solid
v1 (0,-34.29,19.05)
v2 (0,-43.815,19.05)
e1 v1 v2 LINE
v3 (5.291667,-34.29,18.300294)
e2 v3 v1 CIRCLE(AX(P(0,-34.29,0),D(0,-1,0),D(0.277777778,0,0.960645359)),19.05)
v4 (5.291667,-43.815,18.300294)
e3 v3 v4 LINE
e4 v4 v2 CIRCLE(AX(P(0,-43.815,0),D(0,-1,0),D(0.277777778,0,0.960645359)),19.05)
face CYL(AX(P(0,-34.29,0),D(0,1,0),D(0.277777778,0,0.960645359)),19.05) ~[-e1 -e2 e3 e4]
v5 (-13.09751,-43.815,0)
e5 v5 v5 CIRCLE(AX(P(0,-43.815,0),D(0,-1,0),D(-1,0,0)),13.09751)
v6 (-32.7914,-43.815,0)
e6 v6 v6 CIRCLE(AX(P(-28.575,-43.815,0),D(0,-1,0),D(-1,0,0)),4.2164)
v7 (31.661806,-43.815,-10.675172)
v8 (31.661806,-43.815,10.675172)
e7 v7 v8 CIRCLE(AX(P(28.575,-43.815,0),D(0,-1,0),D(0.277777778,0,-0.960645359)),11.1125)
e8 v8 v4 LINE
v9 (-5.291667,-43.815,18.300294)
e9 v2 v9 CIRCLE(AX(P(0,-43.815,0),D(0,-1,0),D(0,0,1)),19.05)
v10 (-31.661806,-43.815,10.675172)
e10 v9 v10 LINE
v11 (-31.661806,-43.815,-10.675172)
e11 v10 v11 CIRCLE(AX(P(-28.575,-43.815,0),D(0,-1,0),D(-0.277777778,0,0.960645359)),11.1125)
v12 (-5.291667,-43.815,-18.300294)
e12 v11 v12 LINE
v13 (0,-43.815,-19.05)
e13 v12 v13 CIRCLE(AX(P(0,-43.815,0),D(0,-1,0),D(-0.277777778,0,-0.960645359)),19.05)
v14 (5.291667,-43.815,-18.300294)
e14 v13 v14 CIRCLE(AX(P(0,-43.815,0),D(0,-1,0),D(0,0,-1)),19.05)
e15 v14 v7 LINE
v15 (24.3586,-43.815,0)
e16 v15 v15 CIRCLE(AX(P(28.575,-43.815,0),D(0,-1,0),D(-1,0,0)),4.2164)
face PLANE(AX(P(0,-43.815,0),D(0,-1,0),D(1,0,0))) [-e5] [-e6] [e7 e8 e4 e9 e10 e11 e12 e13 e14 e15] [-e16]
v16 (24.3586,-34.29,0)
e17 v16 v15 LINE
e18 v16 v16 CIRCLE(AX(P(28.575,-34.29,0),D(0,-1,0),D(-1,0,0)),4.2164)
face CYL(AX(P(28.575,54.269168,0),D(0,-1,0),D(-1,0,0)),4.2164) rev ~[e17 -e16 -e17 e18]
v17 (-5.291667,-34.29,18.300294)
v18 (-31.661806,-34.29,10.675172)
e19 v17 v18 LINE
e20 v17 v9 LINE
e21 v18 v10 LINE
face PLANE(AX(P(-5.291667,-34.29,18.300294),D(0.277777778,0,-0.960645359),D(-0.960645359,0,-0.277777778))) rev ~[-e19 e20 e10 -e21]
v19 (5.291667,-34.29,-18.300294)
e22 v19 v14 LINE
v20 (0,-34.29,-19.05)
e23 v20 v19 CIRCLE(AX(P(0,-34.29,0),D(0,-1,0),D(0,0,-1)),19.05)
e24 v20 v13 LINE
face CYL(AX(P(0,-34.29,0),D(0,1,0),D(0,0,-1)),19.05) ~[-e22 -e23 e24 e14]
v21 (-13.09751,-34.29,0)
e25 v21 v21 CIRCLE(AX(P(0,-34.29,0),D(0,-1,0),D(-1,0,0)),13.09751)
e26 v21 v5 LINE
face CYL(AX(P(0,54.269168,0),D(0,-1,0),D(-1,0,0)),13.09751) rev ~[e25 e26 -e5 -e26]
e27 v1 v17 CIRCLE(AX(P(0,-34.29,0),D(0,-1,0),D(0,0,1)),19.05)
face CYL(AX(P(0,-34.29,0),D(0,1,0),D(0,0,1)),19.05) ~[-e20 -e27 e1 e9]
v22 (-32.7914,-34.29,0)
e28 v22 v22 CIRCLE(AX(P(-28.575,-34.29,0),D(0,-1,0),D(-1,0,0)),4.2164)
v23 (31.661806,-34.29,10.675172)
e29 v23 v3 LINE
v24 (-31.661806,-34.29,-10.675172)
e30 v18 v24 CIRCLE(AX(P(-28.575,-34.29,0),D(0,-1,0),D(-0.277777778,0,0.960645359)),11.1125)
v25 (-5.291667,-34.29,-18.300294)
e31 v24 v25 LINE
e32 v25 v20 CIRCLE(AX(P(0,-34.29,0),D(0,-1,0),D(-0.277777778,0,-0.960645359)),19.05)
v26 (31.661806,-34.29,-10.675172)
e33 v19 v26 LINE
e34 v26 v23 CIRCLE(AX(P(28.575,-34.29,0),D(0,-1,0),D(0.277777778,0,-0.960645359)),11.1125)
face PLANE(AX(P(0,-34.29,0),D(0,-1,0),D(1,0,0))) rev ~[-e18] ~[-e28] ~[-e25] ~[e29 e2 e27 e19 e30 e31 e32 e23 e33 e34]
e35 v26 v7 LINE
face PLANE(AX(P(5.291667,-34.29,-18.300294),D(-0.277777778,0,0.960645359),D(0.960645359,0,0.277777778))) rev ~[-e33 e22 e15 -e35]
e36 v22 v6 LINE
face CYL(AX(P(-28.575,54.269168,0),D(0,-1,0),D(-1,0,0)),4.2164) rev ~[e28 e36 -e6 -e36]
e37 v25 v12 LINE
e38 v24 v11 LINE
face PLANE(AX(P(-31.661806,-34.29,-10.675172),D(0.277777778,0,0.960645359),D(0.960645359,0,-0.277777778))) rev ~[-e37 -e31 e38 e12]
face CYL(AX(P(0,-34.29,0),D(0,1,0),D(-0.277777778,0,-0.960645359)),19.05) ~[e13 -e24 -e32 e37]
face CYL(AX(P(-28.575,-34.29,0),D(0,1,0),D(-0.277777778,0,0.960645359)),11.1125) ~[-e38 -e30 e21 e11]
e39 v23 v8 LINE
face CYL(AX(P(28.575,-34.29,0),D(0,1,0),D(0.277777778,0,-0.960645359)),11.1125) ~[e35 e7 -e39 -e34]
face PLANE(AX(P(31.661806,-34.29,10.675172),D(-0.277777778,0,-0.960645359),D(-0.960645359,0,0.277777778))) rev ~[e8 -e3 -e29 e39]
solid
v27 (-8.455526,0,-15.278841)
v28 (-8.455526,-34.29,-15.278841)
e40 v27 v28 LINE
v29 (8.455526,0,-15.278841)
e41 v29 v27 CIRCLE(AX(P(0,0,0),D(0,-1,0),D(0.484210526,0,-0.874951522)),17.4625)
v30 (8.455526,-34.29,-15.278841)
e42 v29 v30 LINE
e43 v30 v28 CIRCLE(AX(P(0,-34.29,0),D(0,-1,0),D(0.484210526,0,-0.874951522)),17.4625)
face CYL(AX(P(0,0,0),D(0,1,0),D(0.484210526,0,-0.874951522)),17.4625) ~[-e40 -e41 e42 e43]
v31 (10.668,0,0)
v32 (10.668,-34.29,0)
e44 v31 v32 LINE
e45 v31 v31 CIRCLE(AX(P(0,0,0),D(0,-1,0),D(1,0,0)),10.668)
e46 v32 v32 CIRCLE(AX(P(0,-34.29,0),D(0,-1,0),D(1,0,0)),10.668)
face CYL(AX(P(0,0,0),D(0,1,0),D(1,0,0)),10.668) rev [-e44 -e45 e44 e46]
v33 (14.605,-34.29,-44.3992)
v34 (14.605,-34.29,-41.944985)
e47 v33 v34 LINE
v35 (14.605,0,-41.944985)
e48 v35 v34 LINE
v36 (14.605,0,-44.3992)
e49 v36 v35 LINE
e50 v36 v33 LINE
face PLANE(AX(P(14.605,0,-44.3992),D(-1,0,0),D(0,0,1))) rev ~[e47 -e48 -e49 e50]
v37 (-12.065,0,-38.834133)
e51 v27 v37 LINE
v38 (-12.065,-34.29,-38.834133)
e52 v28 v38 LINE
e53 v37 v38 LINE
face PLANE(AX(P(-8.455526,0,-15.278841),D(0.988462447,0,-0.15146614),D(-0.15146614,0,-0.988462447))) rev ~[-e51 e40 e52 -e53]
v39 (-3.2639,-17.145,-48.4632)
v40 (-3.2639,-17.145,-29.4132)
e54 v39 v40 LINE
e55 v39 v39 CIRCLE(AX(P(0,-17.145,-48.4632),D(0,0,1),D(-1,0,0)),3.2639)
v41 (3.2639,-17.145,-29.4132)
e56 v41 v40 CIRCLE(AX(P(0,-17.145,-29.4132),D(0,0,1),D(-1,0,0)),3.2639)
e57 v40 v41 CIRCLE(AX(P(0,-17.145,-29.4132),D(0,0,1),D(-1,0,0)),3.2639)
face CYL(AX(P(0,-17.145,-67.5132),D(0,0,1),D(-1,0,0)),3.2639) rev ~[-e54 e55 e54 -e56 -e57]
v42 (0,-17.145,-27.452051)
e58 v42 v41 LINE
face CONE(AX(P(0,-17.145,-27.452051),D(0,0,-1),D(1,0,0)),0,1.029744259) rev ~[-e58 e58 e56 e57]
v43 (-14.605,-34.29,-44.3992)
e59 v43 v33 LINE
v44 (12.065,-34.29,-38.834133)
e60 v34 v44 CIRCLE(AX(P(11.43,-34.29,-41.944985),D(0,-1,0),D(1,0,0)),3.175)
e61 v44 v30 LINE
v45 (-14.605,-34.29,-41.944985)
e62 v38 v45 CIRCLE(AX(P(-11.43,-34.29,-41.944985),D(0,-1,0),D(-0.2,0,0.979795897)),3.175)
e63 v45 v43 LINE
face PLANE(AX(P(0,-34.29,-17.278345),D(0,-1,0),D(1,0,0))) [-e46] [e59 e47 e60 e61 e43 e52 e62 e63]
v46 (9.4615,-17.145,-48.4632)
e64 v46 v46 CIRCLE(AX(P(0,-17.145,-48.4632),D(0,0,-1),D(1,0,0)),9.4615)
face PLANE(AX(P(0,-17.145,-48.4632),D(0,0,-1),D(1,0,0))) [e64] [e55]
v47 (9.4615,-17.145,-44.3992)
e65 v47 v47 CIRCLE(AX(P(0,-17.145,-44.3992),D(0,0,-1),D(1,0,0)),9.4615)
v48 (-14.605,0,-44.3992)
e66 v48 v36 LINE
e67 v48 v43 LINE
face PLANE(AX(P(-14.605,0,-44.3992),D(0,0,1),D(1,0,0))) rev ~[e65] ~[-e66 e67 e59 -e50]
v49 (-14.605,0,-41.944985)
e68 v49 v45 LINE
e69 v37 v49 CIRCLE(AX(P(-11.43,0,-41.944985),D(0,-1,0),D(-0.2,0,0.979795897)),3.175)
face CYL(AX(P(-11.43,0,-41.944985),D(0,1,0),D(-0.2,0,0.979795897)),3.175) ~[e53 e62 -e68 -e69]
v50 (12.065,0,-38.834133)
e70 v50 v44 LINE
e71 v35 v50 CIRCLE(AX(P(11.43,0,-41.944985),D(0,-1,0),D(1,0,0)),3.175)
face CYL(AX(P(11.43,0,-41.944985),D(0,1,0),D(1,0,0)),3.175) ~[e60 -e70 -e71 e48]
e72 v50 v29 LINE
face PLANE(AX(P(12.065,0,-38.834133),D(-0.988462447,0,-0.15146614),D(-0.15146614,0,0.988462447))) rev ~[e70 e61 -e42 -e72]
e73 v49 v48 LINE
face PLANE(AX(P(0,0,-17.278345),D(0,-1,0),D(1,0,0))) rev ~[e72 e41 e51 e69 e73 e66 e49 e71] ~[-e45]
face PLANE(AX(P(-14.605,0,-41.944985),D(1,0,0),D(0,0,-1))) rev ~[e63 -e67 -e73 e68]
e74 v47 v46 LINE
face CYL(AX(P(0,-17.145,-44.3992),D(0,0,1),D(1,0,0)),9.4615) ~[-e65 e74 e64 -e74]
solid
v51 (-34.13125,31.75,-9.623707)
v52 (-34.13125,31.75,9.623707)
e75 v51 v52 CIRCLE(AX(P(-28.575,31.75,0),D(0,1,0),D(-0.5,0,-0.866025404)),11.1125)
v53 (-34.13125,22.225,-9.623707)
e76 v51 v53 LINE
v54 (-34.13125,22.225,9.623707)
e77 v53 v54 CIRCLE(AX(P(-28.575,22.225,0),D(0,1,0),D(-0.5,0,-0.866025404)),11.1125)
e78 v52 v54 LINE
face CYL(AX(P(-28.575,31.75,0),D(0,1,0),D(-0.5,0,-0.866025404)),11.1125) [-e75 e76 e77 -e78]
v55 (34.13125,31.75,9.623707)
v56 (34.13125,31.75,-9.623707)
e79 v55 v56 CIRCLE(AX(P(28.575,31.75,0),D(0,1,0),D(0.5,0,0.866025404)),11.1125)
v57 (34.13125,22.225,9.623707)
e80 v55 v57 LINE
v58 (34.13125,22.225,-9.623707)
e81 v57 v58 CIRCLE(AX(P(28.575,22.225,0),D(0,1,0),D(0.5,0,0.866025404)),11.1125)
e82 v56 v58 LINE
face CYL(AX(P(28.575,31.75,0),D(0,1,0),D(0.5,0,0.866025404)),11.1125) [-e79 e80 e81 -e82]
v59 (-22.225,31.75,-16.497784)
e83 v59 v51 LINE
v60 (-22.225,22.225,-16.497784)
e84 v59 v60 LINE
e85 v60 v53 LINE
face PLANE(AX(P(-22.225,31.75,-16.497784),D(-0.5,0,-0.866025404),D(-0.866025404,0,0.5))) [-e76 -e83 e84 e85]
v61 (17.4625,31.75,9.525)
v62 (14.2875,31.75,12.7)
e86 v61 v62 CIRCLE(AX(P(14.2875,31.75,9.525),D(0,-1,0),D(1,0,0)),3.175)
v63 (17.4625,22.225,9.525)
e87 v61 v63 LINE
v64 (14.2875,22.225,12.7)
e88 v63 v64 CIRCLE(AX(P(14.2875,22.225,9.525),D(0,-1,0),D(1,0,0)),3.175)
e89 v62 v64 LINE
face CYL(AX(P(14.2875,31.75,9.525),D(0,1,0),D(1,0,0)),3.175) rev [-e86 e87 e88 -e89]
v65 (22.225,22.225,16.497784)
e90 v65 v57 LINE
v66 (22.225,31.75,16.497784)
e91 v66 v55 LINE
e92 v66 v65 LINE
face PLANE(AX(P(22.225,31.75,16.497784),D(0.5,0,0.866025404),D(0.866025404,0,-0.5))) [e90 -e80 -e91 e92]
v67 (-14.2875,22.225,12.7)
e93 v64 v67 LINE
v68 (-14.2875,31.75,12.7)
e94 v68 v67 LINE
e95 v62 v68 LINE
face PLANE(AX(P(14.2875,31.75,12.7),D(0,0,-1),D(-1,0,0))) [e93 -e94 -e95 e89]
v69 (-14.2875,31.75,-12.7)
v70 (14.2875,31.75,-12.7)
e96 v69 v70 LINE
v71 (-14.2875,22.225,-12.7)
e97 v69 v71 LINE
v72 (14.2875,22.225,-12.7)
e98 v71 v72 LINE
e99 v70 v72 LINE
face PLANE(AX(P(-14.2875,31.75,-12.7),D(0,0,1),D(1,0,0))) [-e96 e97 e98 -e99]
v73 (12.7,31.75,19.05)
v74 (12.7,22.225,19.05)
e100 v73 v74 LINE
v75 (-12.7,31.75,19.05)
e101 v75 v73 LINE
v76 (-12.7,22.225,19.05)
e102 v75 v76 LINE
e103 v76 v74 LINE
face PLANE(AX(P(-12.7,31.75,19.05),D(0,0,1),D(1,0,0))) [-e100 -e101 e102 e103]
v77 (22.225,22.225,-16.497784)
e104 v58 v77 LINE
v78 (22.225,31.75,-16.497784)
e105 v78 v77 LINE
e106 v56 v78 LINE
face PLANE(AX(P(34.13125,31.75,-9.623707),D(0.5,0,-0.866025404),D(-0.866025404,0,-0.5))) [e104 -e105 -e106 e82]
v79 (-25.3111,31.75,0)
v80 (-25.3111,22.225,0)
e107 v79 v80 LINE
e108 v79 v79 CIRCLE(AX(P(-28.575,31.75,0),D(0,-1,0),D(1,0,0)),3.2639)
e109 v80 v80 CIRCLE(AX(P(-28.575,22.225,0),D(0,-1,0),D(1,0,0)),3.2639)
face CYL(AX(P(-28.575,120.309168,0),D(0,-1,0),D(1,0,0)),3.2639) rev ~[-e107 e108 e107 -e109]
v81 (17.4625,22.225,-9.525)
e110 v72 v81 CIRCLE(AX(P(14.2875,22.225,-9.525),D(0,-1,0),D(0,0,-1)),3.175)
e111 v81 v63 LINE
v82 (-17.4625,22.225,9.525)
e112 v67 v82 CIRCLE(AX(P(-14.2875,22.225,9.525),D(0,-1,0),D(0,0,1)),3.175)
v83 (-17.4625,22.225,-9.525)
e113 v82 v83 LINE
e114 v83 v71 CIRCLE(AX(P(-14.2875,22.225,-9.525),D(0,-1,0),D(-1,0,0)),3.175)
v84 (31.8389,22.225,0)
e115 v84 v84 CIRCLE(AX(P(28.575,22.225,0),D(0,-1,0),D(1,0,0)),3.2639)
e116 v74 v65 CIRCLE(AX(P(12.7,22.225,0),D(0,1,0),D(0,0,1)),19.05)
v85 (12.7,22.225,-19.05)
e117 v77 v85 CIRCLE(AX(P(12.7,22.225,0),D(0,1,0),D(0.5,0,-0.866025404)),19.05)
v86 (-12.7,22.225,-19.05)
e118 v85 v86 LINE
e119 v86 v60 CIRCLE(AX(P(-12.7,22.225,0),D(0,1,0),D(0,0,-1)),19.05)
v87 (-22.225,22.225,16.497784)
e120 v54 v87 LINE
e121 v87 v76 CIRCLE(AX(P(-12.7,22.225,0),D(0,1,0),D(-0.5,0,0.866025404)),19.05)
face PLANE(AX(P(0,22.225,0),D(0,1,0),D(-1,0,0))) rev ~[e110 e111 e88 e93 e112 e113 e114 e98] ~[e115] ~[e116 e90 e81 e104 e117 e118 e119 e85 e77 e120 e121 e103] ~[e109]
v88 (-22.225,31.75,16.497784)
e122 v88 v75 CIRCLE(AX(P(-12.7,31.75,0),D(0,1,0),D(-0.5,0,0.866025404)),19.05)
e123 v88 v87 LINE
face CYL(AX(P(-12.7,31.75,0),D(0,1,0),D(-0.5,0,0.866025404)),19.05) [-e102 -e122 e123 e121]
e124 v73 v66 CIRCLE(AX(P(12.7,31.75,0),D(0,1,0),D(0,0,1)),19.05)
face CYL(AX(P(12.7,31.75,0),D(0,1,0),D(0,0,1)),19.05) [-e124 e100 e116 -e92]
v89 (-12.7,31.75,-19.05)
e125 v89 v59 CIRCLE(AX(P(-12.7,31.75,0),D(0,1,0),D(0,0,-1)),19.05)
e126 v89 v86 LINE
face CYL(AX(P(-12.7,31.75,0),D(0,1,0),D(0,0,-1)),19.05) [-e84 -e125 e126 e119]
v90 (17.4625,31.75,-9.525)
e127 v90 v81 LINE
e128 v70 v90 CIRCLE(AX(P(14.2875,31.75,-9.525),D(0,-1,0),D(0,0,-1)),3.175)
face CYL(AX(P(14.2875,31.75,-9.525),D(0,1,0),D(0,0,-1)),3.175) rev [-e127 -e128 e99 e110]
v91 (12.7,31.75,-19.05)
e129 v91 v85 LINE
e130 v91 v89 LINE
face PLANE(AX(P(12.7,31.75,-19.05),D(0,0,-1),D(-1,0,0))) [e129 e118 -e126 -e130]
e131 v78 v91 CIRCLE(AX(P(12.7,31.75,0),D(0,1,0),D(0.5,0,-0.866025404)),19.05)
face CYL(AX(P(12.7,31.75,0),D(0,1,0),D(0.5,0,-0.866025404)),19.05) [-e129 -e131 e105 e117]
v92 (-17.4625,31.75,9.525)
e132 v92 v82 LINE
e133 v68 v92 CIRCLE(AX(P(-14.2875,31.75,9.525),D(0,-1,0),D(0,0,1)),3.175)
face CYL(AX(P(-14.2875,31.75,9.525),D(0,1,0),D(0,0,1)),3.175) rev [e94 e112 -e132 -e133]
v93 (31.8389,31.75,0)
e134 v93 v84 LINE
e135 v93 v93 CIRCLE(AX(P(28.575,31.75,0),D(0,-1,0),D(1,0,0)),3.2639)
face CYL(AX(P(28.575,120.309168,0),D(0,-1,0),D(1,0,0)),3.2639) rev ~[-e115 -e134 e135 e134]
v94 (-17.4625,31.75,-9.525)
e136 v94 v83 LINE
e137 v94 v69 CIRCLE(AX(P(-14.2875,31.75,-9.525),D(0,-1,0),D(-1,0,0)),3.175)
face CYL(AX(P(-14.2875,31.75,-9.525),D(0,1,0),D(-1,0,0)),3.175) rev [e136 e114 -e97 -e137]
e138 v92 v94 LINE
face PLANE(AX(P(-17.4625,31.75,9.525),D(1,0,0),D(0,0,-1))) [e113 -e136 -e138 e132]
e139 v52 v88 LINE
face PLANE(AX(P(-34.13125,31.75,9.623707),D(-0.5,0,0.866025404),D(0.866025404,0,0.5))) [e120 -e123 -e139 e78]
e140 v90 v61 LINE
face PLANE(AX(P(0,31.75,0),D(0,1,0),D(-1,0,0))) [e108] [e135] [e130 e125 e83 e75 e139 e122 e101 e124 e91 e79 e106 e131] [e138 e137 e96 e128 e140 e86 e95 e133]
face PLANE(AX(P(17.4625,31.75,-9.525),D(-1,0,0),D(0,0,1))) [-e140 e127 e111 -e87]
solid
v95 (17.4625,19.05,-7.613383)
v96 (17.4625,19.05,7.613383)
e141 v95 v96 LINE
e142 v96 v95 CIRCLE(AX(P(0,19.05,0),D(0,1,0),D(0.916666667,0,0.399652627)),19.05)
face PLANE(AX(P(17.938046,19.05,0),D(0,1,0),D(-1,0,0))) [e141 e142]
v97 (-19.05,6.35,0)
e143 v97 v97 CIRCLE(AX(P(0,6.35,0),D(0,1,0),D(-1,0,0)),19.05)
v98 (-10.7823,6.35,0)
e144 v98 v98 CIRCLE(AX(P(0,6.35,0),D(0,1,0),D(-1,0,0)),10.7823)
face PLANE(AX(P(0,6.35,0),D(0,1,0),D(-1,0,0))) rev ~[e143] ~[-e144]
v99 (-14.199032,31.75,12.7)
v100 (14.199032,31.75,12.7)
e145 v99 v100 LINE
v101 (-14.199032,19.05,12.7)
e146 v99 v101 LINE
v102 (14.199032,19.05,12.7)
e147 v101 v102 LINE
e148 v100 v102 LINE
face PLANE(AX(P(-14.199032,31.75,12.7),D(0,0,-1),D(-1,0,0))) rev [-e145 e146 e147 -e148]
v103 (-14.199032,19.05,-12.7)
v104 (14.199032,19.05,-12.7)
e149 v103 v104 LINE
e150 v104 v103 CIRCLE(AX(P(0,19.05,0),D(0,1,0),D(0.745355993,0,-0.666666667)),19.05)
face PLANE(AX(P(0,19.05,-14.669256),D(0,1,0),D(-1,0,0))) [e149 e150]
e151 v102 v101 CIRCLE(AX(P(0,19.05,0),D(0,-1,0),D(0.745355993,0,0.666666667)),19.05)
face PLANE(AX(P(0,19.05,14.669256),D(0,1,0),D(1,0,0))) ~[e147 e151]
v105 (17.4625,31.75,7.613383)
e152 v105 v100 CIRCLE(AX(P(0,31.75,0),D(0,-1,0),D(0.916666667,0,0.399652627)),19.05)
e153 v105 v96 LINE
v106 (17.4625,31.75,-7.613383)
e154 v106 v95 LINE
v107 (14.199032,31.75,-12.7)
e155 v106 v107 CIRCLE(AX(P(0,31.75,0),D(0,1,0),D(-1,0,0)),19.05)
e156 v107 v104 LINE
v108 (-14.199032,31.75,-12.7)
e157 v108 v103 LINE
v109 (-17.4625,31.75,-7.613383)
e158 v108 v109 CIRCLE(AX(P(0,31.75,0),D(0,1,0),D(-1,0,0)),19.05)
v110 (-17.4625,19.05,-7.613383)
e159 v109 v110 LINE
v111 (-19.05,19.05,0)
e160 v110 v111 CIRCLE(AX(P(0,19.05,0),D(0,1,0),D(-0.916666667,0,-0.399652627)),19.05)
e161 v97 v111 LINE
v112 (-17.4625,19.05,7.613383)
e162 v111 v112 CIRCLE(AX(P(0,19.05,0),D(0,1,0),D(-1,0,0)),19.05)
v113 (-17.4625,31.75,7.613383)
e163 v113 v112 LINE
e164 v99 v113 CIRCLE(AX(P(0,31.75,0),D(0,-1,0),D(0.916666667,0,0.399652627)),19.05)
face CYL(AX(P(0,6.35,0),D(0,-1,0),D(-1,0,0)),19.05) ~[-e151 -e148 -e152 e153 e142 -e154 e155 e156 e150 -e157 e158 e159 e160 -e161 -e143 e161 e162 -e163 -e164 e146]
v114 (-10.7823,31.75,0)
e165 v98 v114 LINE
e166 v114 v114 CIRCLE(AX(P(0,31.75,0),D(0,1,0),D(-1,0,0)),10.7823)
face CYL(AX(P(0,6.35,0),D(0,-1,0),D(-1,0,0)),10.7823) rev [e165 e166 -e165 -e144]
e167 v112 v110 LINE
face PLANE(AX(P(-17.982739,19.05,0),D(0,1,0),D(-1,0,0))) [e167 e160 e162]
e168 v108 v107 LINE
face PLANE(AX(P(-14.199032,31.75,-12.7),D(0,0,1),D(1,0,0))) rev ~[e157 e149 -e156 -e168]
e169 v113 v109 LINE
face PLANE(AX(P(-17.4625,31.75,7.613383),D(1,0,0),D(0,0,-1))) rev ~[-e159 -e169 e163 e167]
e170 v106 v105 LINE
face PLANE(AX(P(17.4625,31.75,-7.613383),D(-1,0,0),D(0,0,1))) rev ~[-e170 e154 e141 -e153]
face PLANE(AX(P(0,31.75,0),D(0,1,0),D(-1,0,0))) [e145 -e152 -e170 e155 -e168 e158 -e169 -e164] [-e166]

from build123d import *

# Parameters (mm, degrees)
F0_R      = 10.668
F1_DEPTH  = 34.29
F2_R      = 9.4615
F3_DEPTH  = 4.064
F5_D      = 6.5278
F5_DEPTH  = 19.05
F5_TIP    = 1.9611489744
F7_DEPTH  = 9.525
F8_D      = 26.19502
F9_D      = 8.4328
F11_R     = 19.05
F11_R_2   = 10.7823
F12_DEPTH = 25.4
F14_DEPTH = 12.7
F16_DEPTH = 9.525
F17_D     = 6.5278


# Not quite as in the source:
# - a pattern or mirror of a feature is missing from the dataset's text; its kind, count and spacing are read off the source's solid


with BuildPart() as f1:
    # F0 (on Front) → F1 (new body)
    with BuildSketch(Plane.XZ):
        with BuildLine():
            Line((12.065, -38.8341331818), (8.4555263158, -15.2788409565))
            ThreePointArc((8.4555263158, -15.2788409565), (0, 17.4625), (-8.4555263158, -15.2788409565))
            Line((-8.4555263158, -15.2788409565), (-12.065, -38.8341331818))
            ThreePointArc((-12.065, -38.8341331818), (-13.8893444248, -39.9369388409), (-14.605, -41.9449851551))
            Line((-14.605, -41.9449851551), (-14.605, -44.3992))
            Line((-14.605, -44.3992), (14.605, -44.3992))
            Line((14.605, -44.3992), (14.605, -41.9449851551))
            ThreePointArc((14.605, -41.9449851551), (13.8893444248, -39.9369388409), (12.065, -38.8341331818))
        make_face()
        Circle(F0_R, mode=Mode.SUBTRACT)
    extrude(amount=F1_DEPTH)

    # F2 (on face) → F3 (join)
    with BuildSketch(Plane(origin=(0, 0, -44.3992), x_dir=(1, 0, 0), z_dir=(0, 0, -1))):
        with Locations((0, 17.145)):
            Circle(F2_R)
    extrude(amount=F3_DEPTH)

    # F5
    with Locations(Plane(origin=(0, 0, -48.4632), x_dir=(1, 0, 0), z_dir=(0, 0, -1))):
        with Locations((0, 17.145)):
            Hole(F5_D / 2, depth=F5_DEPTH)
            with Locations((0, 0, -(F5_DEPTH + F5_TIP / 2))):  # 118° drill point
                Cone(0, F5_D / 2, F5_TIP, mode=Mode.SUBTRACT)


with BuildPart() as f7:
    # F6 (on face) → F7 (new body)
    with BuildSketch(Plane.XZ.offset(34.29)):
        with BuildLine():
            Line((5.2916666667, -18.300294093), (31.6618055556, -10.6751715542))
            ThreePointArc((31.6618055556, -10.6751715542), (39.6875, 0), (31.6618055556, 10.6751715542))
            Line((31.6618055556, 10.6751715542), (5.2916666667, 18.300294093))
            ThreePointArc((5.2916666667, 18.300294093), (2.6722553704, 18.861642326), (0, 19.05))
            ThreePointArc((0, 19.05), (-2.6722553704, 18.861642326), (-5.2916666667, 18.300294093))
            Line((-5.2916666667, 18.300294093), (-31.6618055556, 10.6751715542))
            ThreePointArc((-31.6618055556, 10.6751715542), (-39.6875, 0), (-31.6618055556, -10.6751715542))
            Line((-31.6618055556, -10.6751715542), (-5.2916666667, -18.300294093))
            ThreePointArc((-5.2916666667, -18.300294093), (-2.6722553704, -18.861642326), (0, -19.05))
            ThreePointArc((0, -19.05), (2.6722553704, -18.861642326), (5.2916666667, -18.300294093))
        make_face()
    extrude(amount=F7_DEPTH)

    # F8 (through all)
    with Locations(Plane(origin=(0, -34.29, 0), x_dir=(1, 0, 0), z_dir=(0, 1, 0))):
        with Locations((0, 0)):
            Hole(F8_D / 2)

    # F9 (through all)
    with Locations(Plane(origin=(0, -34.29, 0), x_dir=(1, 0, 0), z_dir=(0, 1, 0))):
        with Locations((28.575, 0), (-28.575, 0)):
            Hole(F9_D / 2)


with BuildPart() as f12:
    # F11 (on offset) → F12 (new body)
    with BuildSketch(Plane(origin=(0, 6.35, 0), x_dir=(-1, 0, 0), z_dir=(0, 1, 0))):
        Circle(F11_R)
        Circle(F11_R_2, mode=Mode.SUBTRACT)
    extrude(amount=F12_DEPTH)

    # F13 (on face) → F14 (cut)
    with BuildSketch(Plane(origin=(0, 31.75, 0), x_dir=(-1, 0, 0), z_dir=(0, 1, 0))):
        with BuildLine():
            Line((17.4625, 12.7), (14.1990316571, 12.7))
            ThreePointArc((14.1990316571, 12.7), (16.0337633139, 10.2869302512), (17.4625, 7.6133825433))
            Line((17.4625, 7.6133825433), (17.4625, 12.7))
        make_face()
        with BuildLine():
            Line((14.1990316571, -12.7), (-14.1990316571, -12.7))
            ThreePointArc((-14.1990316571, -12.7), (0, -19.05), (14.1990316571, -12.7))
        make_face()
        with BuildLine():
            Line((-17.4625, -7.6133825433), (-17.4625, 7.6133825433))
            ThreePointArc((-17.4625, 7.6133825433), (-19.05, 0), (-17.4625, -7.6133825433))
        make_face()
        with BuildLine():
            ThreePointArc((19.05, 0), (18.6489024476, 3.8885649667), (17.4625, 7.6133825433))
            Line((17.4625, 7.6133825433), (17.4625, -7.6133825433))
            ThreePointArc((17.4625, -7.6133825433), (18.6489024476, -3.8885649667), (19.05, 0))
        make_face()
    f14 = extrude(amount=-F14_DEPTH, mode=Mode.SUBTRACT)

    # F14_copies: F14 across plane
    add(f14.mirror(Plane.XY), mode=Mode.SUBTRACT)


with BuildPart() as f16:
    # F15 (on face) → F16 (new body)
    with BuildSketch(Plane(origin=(0, 31.75, 0), x_dir=(-1, 0, 0), z_dir=(0, 1, 0))):
        with BuildLine():
            Line((22.225, -16.4977839421), (34.13125, -9.6237072996))
            ThreePointArc((34.13125, -9.6237072996), (39.6875, 0), (34.13125, 9.6237072996))
            Line((34.13125, 9.6237072996), (22.225, 16.4977839421))
            ThreePointArc((22.225, 16.4977839421), (17.6305028092, 18.4008869908), (12.7, 19.05))
            Line((12.7, 19.05), (-12.7, 19.05))
            ThreePointArc((-12.7, 19.05), (-17.6305028092, 18.4008869908), (-22.225, 16.4977839421))
            Line((-22.225, 16.4977839421), (-34.13125, 9.6237072996))
            ThreePointArc((-34.13125, 9.6237072996), (-39.6875, 0), (-34.13125, -9.6237072996))
            Line((-34.13125, -9.6237072996), (-22.225, -16.4977839421))
            ThreePointArc((-22.225, -16.4977839421), (-17.6305028092, -18.4008869908), (-12.7, -19.05))
            Line((-12.7, -19.05), (12.7, -19.05))
            ThreePointArc((12.7, -19.05), (17.6305028092, -18.4008869908), (22.225, -16.4977839421))
        make_face()
        with BuildLine():
            ThreePointArc((-17.4625, 9.525), (-16.5325640303, 11.7700640303), (-14.2875, 12.7))
            Line((-14.2875, 12.7), (14.2875, 12.7))
            ThreePointArc((14.2875, 12.7), (16.5325640303, 11.7700640303), (17.4625, 9.525))
            Line((17.4625, 9.525), (17.4625, -9.525))
            ThreePointArc((17.4625, -9.525), (16.5325640303, -11.7700640303), (14.2875, -12.7))
            Line((14.2875, -12.7), (-14.2875, -12.7))
            ThreePointArc((-14.2875, -12.7), (-16.5325640303, -11.7700640303), (-17.4625, -9.525))
            Line((-17.4625, -9.525), (-17.4625, 9.525))
        make_face(mode=Mode.SUBTRACT)
    extrude(amount=-F16_DEPTH)

    # F17 (through all)
    with Locations(Plane(origin=(0, 31.75, 0), x_dir=(-1, 0, 0), z_dir=(0, 1, 0))):
        with Locations((-28.575, 0), (28.575, 0)):
            Hole(F17_D / 2)


solid = Compound([f1.part, f7.part, f12.part, f16.part])
